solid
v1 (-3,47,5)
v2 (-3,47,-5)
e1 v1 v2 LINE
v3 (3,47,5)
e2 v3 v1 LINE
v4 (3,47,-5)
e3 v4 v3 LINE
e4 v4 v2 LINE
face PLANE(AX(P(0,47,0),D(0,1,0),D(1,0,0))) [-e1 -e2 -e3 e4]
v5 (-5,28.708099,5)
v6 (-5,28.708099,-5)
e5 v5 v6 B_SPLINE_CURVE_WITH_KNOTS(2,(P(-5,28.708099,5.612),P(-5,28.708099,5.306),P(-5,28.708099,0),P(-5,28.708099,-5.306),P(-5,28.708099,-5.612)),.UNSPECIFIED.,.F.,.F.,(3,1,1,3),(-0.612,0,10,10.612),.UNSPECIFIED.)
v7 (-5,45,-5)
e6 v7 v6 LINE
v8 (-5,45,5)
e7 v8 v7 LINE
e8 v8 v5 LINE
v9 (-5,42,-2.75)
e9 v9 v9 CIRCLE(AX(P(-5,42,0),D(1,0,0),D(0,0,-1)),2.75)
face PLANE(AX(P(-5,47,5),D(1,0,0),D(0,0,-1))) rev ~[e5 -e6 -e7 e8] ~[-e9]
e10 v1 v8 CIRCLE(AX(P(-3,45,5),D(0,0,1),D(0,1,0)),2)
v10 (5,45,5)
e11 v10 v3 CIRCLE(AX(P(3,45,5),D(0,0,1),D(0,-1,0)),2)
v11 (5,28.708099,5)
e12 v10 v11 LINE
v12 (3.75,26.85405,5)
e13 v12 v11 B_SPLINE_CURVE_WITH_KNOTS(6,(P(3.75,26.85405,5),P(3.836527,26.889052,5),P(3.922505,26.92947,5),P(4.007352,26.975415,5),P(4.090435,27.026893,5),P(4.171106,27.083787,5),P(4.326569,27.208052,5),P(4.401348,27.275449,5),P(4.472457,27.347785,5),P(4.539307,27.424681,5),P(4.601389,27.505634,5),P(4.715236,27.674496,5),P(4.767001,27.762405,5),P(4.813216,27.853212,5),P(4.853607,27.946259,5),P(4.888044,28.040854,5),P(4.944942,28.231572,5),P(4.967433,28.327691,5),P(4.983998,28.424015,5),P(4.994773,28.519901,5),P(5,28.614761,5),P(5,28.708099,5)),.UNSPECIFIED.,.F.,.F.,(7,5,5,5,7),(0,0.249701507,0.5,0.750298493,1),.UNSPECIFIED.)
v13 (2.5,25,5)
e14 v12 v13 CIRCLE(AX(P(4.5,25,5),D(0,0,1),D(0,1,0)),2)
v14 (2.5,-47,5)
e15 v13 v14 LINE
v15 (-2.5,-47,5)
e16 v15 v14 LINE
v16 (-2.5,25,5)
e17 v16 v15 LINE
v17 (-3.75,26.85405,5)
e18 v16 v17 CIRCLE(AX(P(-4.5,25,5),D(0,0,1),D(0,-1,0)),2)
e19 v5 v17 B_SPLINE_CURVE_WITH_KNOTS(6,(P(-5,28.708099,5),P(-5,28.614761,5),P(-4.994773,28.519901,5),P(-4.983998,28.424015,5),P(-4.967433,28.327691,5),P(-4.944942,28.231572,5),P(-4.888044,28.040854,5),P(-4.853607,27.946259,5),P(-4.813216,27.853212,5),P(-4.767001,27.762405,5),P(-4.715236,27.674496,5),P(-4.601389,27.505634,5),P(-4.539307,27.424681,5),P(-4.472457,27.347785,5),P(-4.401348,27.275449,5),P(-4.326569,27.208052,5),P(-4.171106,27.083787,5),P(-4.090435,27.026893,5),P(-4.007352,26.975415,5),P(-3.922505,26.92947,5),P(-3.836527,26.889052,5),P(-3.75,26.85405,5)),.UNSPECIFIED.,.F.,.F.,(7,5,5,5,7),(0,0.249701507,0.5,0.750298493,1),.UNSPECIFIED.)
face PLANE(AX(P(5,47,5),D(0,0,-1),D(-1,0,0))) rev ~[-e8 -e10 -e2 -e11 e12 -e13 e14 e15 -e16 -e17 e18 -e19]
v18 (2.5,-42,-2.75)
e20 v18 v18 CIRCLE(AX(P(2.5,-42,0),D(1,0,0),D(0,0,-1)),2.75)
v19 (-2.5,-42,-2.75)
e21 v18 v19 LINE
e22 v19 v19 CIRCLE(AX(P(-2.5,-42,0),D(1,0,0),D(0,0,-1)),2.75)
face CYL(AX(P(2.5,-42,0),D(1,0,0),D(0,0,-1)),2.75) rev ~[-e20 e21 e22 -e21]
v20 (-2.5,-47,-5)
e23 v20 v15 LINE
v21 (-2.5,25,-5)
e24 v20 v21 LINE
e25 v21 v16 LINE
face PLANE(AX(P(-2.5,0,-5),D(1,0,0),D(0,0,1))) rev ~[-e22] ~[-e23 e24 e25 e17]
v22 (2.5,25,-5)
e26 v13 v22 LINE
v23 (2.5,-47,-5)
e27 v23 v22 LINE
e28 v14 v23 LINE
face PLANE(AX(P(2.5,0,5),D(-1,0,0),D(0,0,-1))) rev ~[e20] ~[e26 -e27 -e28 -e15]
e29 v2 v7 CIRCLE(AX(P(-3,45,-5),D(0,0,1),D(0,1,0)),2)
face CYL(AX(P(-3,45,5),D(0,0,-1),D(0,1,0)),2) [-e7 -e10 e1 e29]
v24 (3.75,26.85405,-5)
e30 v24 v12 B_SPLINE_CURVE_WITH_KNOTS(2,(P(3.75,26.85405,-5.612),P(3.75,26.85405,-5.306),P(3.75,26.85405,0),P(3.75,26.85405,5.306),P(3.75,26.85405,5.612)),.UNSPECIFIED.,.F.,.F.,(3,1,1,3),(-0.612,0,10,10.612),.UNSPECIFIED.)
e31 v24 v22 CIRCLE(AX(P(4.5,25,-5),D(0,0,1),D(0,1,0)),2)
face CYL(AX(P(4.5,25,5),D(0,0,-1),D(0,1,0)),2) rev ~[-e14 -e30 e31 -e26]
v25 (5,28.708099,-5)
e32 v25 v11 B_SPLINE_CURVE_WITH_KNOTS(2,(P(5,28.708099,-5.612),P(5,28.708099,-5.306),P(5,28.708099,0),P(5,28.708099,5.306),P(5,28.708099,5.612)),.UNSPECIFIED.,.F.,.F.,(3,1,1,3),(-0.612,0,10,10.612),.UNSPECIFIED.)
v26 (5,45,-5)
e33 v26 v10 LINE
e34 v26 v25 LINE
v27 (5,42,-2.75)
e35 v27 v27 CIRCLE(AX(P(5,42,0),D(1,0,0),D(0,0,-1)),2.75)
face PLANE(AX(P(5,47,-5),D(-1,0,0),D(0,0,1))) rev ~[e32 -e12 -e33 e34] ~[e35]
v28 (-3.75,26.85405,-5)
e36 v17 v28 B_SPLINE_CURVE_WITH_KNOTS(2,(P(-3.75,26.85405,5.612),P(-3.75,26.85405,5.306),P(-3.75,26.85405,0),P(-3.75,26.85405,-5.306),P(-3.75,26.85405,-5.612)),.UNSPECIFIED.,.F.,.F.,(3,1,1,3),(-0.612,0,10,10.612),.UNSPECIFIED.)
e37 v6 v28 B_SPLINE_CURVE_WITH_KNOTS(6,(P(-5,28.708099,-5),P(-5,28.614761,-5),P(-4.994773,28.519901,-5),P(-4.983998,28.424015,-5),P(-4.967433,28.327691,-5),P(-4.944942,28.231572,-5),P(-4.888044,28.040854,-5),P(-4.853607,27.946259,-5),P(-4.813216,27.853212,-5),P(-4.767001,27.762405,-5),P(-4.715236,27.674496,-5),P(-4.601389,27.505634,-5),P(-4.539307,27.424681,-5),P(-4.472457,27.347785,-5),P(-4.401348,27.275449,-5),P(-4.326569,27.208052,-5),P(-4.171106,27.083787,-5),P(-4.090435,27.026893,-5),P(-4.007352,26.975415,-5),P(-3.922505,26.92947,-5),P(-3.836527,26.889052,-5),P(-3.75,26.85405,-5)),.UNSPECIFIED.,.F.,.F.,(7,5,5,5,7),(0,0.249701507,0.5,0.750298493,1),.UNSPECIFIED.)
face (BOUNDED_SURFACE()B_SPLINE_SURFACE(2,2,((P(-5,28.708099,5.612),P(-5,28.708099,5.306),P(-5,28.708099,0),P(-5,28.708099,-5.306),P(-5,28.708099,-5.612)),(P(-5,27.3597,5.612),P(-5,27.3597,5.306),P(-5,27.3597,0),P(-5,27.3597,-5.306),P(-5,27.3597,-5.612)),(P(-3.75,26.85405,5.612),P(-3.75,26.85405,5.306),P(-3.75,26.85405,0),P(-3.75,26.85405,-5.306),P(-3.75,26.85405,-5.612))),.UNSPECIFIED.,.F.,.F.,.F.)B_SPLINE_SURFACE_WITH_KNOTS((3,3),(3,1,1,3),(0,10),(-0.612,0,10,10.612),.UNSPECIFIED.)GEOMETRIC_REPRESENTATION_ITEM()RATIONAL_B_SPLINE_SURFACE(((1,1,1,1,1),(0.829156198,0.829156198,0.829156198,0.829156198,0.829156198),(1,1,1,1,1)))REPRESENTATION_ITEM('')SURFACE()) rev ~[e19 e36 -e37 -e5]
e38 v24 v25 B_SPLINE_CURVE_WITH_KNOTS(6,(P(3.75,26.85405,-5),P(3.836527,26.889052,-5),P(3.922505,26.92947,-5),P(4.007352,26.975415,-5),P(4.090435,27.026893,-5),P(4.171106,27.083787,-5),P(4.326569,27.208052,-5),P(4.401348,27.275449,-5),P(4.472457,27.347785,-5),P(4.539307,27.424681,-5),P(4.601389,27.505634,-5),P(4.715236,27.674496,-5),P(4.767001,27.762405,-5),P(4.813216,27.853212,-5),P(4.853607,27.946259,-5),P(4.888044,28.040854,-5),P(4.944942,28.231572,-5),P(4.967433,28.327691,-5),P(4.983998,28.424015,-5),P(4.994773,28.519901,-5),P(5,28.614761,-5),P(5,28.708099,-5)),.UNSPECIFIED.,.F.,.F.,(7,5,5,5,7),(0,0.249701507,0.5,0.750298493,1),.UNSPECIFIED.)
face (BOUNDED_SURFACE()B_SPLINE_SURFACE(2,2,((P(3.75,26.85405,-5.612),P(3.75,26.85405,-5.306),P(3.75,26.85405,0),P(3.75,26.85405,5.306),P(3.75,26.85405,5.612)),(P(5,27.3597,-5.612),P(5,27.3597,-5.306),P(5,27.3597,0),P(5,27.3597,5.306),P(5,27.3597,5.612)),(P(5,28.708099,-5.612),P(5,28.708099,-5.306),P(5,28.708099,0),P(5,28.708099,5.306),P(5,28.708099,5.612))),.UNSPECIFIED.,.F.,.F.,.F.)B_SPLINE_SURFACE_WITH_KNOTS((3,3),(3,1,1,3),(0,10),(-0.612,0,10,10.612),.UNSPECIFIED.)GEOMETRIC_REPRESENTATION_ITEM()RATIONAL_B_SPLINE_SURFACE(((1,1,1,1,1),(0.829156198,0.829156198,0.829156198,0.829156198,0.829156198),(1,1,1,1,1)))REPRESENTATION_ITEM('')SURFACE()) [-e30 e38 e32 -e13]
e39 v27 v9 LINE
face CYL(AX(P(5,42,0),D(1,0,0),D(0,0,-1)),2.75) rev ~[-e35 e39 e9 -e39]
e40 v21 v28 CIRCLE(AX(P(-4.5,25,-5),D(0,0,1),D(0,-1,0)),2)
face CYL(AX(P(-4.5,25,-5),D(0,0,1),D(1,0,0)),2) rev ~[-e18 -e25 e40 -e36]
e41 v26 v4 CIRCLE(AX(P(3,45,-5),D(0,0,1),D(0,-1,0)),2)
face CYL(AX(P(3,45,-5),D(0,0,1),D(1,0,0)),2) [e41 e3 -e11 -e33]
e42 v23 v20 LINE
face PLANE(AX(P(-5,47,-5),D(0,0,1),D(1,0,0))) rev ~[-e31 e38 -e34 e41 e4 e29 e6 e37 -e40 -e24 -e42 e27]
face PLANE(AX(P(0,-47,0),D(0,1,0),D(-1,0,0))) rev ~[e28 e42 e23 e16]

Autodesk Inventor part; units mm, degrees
ref_plane "YZ Plane" through (0, 0, 0) normal (1, 0, 0) x (0, 1, 0)
ref_plane "XZ Plane" through (0, 0, 0) normal (0, 1, 0) x (-1, 0, 0)
ref_plane "XY Plane" through (0, 0, 0) normal (0, 0, 1) x (1, 0, 0)
sketch "Szkic1" plane through (0, 0, 0) normal (0, 1, 0) x (-1, 0, 0)
  line L0 (-2.5, -5) -> (2.5, -5)
  line L1 (2.5, -5) -> (2.5, 5)
  line L2 (2.5, 5) -> (-2.5, 5)
  line L3 (-2.5, 5) -> (-2.5, -5)
  line L4 (-2.5, -5) -> (2.5, 5) construction
  line L5 (2.5, -5) -> (-2.5, 5) construction
  point P0 (0, 0)
  dimension "d0" = 5
  dimension "d1" = 10
extrude "Wyciągnięcie proste1" add sketch "Szkic1" along normal mid plane 94
sketch "Szkic3" plane through (2.5, -47, 5) normal (1, 0, 0) x (0, 0, -1)
  circle A0 centre (5, 5) radius 2.75
  line L0 (10, 0) -> (0, 0) projected
  line L1 (10, 0) -> (10, 94) projected
  point P0 (5, 47)
  point P1 (10, 118)
  dimension "d10" = 5.5
  dimension "d11" = 5
  dimension "d12" = 5
extrude "Wyciągnięcie proste3" cut sketch "Szkic3" against normal blind 120
sketch "Szkic4" plane through (2.5, -47, -5) normal (1, 0, 0) x (0, 0, -1)
  point P0 (-5, 47)
sketch "Szkic5" plane through (0, 47, 0) normal (0, 1, 0) x (1, 0, 0)
  line L0 (5, -5) -> (-5, -5)
  line L1 (-5, -5) -> (-5, 5)
  line L2 (-5, 5) -> (5, 5)
  line L3 (5, 5) -> (5, -5)
  line L4 (5, -5) -> (-5, 5) construction
  line L5 (-5, -5) -> (5, 5) construction
  point P0 (0, 0)
  dimension "d16" = 10
  dimension "d17" = 10
extrude "Wyciągnięcie proste4" add sketch "Szkic5" against normal blind 20
sketch "Szkic6" plane through (5, 47, 5) normal (1, 0, 0) x (0, 0, -1)
  circle A0 centre (5, -5) radius 2.75
  line L0 (0, 0) -> (10, 0) projected
  line L1 (0, 0) -> (0, -20) projected
  point P0 (5, -47)
  dimension "d20" = 5.5
  dimension "d21" = 5
  dimension "d22" = 5
extrude "Wyciągnięcie proste5" cut sketch "Szkic6" against normal blind 20
fillet "Zaokrąglenie3" radius 2 6 edges at (2.5, 27, 0) (5, 27, 0) (-5, 27, 0) (-2.5, 27, 0) (-5, 47, 0) (5, 47, 0)
properties part number "element_posredni"
